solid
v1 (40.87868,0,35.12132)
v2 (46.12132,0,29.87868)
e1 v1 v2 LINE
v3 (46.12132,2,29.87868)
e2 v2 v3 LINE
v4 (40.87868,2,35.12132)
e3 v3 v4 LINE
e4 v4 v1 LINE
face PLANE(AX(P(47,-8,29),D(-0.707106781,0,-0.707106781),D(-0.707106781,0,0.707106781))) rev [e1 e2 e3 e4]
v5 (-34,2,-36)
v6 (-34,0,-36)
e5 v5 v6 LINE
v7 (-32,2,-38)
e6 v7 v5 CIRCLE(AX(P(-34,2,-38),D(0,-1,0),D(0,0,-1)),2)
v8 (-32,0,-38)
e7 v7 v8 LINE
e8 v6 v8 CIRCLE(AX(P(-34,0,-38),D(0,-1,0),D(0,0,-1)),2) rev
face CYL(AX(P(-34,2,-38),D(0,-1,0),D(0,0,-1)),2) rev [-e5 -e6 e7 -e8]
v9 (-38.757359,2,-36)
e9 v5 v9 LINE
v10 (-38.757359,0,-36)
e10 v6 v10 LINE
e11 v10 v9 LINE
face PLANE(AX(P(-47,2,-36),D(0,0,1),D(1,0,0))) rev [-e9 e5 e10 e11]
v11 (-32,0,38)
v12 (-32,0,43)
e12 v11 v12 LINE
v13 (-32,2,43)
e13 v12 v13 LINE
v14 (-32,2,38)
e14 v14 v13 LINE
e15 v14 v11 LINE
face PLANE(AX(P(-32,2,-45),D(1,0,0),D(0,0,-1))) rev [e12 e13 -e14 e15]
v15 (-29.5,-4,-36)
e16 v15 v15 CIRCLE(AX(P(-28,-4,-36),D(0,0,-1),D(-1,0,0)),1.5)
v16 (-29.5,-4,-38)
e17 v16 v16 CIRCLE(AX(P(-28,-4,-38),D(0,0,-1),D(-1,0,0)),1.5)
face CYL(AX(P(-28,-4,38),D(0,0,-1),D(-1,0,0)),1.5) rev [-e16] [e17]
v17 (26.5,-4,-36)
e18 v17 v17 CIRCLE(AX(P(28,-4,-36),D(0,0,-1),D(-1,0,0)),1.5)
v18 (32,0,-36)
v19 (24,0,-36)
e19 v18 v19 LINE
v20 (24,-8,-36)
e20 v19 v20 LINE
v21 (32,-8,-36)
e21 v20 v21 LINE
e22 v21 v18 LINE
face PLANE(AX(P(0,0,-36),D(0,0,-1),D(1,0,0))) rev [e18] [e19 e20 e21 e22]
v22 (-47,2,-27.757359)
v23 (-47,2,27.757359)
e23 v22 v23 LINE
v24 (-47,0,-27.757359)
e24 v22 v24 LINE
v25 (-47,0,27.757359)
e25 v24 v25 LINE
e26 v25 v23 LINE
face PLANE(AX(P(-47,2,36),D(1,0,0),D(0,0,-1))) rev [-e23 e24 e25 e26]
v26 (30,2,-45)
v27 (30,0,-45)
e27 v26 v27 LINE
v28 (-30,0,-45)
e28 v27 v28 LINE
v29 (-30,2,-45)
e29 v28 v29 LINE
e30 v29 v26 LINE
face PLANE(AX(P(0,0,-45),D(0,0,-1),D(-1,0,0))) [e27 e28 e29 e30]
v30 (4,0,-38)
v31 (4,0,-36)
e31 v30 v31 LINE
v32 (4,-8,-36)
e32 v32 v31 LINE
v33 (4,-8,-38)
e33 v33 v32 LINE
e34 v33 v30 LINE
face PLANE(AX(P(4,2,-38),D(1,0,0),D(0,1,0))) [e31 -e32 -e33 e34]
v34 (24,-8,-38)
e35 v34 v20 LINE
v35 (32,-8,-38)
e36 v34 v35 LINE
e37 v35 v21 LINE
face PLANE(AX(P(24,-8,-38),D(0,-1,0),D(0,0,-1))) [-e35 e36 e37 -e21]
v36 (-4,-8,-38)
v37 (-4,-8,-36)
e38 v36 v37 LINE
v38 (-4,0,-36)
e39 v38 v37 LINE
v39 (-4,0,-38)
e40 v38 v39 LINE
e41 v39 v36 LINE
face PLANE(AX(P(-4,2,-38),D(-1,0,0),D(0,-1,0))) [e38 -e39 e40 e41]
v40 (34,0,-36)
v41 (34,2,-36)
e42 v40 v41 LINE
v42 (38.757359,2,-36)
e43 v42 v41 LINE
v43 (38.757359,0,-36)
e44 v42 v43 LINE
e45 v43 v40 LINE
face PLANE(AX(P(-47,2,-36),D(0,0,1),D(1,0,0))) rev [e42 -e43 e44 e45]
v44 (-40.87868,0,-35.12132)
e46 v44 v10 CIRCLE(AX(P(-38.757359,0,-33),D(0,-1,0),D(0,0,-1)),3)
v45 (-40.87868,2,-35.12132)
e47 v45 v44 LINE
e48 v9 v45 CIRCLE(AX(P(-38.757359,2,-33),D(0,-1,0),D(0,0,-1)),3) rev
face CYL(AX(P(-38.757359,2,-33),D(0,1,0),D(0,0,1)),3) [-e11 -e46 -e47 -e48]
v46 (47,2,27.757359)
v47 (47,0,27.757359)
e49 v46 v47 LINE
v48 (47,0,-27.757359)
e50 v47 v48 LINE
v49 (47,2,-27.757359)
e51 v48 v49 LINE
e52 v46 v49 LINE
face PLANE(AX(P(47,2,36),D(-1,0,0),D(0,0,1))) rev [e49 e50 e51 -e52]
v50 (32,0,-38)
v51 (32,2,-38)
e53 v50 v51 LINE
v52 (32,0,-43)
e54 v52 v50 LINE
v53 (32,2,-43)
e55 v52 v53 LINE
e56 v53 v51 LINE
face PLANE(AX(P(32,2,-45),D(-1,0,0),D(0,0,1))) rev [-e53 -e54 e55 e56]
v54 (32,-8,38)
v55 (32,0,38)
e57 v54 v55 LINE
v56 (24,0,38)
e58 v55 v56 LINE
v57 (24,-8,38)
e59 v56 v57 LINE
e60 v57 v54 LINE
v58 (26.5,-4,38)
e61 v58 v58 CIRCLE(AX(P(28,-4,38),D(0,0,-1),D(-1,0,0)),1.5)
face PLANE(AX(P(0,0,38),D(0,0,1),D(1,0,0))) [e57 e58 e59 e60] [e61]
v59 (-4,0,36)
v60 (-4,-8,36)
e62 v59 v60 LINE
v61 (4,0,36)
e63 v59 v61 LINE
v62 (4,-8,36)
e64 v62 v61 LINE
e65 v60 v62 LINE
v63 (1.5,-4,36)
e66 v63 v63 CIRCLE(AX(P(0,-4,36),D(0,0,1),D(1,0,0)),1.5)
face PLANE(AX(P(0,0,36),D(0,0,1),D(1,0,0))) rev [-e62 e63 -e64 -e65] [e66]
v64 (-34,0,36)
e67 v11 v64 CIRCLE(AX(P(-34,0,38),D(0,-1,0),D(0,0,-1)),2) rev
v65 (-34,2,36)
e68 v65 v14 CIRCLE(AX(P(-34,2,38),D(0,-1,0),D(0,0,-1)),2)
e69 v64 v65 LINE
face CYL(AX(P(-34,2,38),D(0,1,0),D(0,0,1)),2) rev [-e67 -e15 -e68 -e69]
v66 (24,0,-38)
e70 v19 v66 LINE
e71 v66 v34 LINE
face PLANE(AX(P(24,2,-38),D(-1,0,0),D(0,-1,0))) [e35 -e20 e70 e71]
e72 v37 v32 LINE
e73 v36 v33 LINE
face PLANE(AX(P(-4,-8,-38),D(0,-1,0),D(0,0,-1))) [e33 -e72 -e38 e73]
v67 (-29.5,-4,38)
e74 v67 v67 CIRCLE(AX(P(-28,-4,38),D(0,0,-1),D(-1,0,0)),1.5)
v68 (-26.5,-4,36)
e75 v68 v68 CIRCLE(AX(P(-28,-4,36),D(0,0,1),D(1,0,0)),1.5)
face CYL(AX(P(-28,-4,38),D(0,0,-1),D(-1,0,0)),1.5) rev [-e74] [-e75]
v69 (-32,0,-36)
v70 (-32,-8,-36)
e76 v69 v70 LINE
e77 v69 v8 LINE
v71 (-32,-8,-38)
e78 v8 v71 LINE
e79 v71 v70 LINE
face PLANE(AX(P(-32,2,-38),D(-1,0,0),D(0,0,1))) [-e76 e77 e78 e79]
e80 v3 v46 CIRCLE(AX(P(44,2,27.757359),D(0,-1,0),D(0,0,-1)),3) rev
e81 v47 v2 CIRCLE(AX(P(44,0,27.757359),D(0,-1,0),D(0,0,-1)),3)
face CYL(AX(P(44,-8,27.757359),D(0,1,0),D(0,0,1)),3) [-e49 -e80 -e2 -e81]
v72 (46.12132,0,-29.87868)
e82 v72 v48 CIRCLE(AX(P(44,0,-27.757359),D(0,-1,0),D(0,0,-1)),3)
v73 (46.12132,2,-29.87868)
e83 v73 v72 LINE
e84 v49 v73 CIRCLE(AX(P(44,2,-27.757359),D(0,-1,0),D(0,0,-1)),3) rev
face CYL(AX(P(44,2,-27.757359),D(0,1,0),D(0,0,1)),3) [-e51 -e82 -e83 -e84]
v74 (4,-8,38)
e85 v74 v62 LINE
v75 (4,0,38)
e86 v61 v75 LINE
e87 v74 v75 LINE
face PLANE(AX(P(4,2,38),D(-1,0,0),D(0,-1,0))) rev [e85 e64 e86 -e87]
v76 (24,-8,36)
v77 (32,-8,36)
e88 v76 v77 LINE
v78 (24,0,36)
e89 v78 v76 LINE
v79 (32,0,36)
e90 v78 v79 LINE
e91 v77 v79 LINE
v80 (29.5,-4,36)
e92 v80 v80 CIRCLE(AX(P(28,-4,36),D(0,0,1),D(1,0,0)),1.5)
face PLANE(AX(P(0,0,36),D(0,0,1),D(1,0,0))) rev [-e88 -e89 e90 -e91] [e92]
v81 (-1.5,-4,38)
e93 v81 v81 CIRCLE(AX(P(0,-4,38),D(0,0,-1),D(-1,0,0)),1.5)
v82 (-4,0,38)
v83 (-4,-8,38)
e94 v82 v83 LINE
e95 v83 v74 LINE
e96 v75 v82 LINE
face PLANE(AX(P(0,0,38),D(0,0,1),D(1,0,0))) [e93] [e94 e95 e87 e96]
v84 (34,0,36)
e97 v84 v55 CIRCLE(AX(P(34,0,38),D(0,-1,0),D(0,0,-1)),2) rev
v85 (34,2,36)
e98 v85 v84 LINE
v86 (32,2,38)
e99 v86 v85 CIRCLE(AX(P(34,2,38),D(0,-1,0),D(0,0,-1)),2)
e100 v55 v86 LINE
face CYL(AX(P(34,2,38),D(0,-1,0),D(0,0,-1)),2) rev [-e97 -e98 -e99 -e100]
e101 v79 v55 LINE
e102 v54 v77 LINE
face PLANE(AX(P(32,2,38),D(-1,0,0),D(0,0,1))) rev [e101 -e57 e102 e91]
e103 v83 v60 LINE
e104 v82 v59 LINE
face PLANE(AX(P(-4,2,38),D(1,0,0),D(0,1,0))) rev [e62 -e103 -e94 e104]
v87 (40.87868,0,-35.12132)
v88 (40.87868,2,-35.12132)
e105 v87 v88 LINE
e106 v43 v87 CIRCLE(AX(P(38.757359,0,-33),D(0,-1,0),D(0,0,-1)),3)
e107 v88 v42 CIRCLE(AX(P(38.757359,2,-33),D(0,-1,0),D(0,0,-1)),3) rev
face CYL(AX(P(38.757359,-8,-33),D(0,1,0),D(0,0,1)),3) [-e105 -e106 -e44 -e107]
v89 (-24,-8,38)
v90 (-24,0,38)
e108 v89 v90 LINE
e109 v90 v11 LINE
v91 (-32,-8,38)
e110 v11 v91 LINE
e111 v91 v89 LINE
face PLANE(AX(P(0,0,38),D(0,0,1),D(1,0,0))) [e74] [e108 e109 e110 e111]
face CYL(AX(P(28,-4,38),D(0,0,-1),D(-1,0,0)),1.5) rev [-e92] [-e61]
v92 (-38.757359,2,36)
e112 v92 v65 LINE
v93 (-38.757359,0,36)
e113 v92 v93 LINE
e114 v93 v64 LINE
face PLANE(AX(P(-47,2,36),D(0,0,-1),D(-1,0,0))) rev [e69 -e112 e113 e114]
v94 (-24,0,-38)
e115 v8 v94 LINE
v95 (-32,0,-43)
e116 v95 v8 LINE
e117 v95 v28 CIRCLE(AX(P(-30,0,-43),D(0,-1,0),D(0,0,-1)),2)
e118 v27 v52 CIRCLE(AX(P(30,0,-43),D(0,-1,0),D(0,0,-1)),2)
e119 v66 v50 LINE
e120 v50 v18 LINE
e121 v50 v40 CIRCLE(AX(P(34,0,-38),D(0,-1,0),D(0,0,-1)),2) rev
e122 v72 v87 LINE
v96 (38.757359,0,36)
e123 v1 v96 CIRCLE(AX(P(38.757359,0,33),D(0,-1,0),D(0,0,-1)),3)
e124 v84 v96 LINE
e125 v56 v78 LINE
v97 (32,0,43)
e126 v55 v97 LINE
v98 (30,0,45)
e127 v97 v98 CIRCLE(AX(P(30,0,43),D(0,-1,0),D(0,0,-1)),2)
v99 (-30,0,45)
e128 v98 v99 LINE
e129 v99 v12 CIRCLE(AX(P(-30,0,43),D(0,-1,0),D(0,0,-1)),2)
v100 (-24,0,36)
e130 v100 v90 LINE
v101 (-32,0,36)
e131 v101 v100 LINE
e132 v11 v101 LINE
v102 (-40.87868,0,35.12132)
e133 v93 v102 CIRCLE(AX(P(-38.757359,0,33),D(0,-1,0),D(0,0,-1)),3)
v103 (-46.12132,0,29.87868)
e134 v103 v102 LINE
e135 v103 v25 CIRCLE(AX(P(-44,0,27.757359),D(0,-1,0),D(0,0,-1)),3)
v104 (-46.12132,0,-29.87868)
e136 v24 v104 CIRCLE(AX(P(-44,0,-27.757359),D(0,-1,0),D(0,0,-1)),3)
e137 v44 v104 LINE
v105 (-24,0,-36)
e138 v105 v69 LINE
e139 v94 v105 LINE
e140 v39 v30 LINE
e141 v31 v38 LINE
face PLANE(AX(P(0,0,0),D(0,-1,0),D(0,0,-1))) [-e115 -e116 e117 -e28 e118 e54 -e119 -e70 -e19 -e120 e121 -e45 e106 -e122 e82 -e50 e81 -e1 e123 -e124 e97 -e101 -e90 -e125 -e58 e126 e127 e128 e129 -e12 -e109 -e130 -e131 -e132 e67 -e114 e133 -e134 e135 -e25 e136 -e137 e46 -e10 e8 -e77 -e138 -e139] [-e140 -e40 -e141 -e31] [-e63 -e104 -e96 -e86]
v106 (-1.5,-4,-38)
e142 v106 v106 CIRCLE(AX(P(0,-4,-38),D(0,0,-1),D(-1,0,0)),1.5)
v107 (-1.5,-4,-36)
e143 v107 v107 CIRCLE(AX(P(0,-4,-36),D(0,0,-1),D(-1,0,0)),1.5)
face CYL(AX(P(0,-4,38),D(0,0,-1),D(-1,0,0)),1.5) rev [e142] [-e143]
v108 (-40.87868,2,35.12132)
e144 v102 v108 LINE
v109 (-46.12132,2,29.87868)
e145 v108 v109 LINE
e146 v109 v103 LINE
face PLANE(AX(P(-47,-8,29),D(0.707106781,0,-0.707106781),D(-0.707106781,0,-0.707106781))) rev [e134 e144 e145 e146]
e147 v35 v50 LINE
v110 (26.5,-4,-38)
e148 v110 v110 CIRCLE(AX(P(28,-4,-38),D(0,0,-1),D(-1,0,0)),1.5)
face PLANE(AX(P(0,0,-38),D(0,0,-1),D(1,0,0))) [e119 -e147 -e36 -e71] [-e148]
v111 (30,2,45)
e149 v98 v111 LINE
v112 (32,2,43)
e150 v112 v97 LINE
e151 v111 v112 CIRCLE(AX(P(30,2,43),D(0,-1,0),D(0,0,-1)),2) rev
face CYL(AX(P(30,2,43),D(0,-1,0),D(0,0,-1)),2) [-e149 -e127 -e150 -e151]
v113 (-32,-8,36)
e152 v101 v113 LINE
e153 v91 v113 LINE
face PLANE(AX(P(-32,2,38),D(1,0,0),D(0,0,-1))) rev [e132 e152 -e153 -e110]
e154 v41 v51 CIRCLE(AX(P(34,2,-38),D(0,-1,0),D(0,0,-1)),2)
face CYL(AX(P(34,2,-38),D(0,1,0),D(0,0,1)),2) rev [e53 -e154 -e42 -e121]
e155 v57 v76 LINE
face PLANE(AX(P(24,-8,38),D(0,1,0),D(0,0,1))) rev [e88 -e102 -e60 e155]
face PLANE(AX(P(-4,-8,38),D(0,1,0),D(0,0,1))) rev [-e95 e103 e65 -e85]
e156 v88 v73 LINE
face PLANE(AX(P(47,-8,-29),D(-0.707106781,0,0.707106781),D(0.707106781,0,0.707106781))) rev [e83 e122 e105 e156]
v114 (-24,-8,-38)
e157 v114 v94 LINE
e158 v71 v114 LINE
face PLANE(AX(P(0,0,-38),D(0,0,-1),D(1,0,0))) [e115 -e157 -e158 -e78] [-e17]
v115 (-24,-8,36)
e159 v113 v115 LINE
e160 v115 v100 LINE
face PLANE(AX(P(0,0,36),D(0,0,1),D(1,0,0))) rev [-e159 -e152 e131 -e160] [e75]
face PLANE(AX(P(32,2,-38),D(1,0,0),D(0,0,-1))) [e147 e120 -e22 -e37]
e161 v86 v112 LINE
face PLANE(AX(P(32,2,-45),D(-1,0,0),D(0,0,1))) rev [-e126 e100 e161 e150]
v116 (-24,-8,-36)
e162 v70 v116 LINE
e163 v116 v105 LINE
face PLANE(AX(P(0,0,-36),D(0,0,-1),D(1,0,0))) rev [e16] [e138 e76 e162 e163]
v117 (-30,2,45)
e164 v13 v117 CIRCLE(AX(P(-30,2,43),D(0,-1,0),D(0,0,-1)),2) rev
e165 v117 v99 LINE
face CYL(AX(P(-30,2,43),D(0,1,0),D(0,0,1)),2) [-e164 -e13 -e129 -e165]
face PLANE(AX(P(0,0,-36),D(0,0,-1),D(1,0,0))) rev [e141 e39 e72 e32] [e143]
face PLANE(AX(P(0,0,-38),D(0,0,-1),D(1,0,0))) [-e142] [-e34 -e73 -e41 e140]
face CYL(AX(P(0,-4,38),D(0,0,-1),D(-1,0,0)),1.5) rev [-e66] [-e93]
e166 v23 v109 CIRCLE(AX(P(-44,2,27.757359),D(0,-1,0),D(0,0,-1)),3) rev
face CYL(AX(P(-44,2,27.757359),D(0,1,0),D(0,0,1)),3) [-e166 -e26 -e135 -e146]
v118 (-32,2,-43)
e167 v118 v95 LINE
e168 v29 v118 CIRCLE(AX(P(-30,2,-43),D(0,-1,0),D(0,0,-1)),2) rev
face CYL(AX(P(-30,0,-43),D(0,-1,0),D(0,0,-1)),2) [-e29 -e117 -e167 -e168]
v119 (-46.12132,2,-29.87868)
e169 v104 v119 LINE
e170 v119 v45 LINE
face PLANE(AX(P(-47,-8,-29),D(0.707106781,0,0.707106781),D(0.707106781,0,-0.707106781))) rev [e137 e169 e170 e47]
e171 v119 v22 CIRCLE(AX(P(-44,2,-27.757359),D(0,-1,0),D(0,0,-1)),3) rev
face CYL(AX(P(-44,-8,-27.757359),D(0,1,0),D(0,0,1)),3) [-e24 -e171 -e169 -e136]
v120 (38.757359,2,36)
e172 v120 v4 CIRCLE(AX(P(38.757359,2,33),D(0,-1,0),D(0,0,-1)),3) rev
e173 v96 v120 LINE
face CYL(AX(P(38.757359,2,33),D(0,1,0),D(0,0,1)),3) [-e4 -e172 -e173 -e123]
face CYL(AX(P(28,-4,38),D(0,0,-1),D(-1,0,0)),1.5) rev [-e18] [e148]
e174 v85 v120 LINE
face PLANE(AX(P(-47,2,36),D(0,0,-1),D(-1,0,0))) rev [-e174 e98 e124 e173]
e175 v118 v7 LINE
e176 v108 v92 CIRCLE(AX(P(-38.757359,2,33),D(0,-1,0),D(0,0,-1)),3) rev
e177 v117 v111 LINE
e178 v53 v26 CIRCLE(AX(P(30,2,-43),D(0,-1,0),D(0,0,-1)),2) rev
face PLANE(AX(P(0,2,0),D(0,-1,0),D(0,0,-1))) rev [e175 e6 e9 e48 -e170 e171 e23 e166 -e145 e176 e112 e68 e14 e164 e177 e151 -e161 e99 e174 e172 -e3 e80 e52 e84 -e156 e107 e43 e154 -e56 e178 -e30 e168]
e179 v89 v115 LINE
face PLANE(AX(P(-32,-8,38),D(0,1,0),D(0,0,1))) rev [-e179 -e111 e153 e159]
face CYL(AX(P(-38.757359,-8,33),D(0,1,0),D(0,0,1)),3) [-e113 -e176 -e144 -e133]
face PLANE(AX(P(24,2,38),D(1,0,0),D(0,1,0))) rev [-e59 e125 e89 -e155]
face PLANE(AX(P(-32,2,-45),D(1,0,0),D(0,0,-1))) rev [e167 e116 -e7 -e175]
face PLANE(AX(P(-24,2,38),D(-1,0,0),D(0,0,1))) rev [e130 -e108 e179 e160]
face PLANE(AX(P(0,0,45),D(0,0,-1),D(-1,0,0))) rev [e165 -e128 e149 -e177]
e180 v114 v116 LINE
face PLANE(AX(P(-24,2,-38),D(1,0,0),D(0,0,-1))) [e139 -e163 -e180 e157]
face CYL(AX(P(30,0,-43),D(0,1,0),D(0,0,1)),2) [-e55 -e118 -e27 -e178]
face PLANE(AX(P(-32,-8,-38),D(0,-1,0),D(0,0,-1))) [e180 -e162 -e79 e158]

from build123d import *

# Parameters (mm, degrees)
SKETCH_1_W              = 94
SKETCH_1_H              = 72
EXTRUDE_1_DEPTH         = 2
SKETCH_2_W              = 8
SKETCH_2_H              = 10
EXTRUDE_2_DEPTH         = 2
FILLET_4_R              = 2
FILLET_5_R              = 2
SKETCH_3_R              = 1.5
CUT_EXTRUDE_1_DEPTH     = 90.716219269
SKETCH_4_W              = 64
SKETCH_4_H              = 2
EXTRUDE_3_DEPTH         = 45
FILLET_6_R              = 2
CONG_2_R                = 2
ENL_V_MAT_EXTRU_1_DEPTH = 66.833122363
CONG_3_R                = 3


with BuildPart() as part:
    # Эскиз1 → Бобышка-Вытянуть1 (new body)
    with BuildSketch(Plane(origin=(0, 0, 0), x_dir=(1, 0, 0), z_dir=(0, 1, 0))):
        Rectangle(SKETCH_1_W, SKETCH_1_H)
    extrude(amount=EXTRUDE_1_DEPTH)

    # Эскиз2 → Бобышка-Вытянуть2 (add)
    with BuildSketch(Plane.XY.offset(36)):
        with Locations((-28, -3)):
            Rectangle(SKETCH_2_W, SKETCH_2_H)
        with Locations((28, -3)):
            Rectangle(SKETCH_2_W, SKETCH_2_H)
        with Locations((0, -3)):
            Rectangle(SKETCH_2_W, SKETCH_2_H)
    extrude_2 = extrude(amount=EXTRUDE_2_DEPTH)

    # Скругление4
    fillet_4_edges = [part.edges().sort_by_distance(p)[0] for p in [
        (-24, 1, 36),
        (32, 1, 36),
        (4, 1, 36),
        (24, 1, 36),
        (-4, 1, 36),
        (-32, 1, 36),
    ]]
    fillet(fillet_4_edges, radius=FILLET_4_R - 0.0001)  # a hair under: the kernel refuses the full size

    # Зеркальное отражение1: Бобышка-Вытянуть2 across plane
    add(extrude_2.mirror(Plane.XY))

    # Скругление5
    fillet_5_edges = [part.edges().sort_by_distance(p)[0] for p in [
        (24, 1, -36),
        (-4, 1, -36),
        (-32, 1, -36),
        (-24, 1, -36),
        (4, 1, -36),
        (32, 1, -36),
    ]]
    fillet(fillet_5_edges, radius=FILLET_5_R - 0.0001)  # a hair under: the kernel refuses the full size

    # Эскиз3 → Вырез-Вытянуть1 (cut, through all)
    with BuildSketch(Plane(origin=(0, 0, -38), x_dir=(-1, 0, 0), z_dir=(0, 0, -1))):
        with Locations((-28, -4)):
            Circle(SKETCH_3_R)
        with Locations((0, -4)):
            Circle(SKETCH_3_R)
        with Locations((28, -4)):
            Circle(SKETCH_3_R)
    extrude(amount=-CUT_EXTRUDE_1_DEPTH, mode=Mode.SUBTRACT)

    # Эскиз4 → Бобышка-Вытянуть3 (add, symmetric)
    with BuildSketch(Plane(origin=(0, 0, 0), x_dir=(-1, 0, 0), z_dir=(0, 0, -1))):
        with Locations((0, 1)):
            Rectangle(SKETCH_4_W, SKETCH_4_H)
    extrude(amount=EXTRUDE_3_DEPTH, both=True)

    # Скругление6
    fillet_6_edges = [part.edges().sort_by_distance(p)[0] for p in [
        (-32, 1, 45),
        (32, 1, 45),
        (-32, 1, -45),
        (32, 1, -45),
    ]]
    fillet(fillet_6_edges, radius=FILLET_6_R)

    # Congé2
    cong_2_edges = [part.edges().sort_by_distance(p)[0] for p in [
        (47, 1, 36),
        (-47, 1, 36),
        (-47, 1, -36),
        (47, 1, -36),
    ]]
    fillet(cong_2_edges, radius=CONG_2_R)

    # Esquisse1 → Enlèv. mat.-Extru.1 (cut, through all)
    with BuildSketch(Plane(origin=(0, 2, 0), x_dir=(1, 0, 0), z_dir=(0, 1, 0))):
        Polygon((-47, -29), (-40, -36), (-47, -36), align=None)
        Polygon((-47, 36), (-40, 36), (-47, 29), align=None)
        Polygon((47, -29), (47, -36), (40, -36), align=None)
        Polygon((47, 29), (47, 36), (40, 36), align=None)
    extrude(amount=-ENL_V_MAT_EXTRU_1_DEPTH, mode=Mode.SUBTRACT)

    # Congé3
    cong_3_edges = [part.edges().sort_by_distance(p)[0] for p in [
        (-47, 1, -29),
        (-40, 1, -36),
        (40, 1, 36),
        (47, 1, 29),
        (47, 1, -29),
        (40, 1, -36),
        (-47, 1, 29),
        (-40, 1, 36),
    ]]
    fillet(cong_3_edges, radius=CONG_3_R)


solid = part.part
